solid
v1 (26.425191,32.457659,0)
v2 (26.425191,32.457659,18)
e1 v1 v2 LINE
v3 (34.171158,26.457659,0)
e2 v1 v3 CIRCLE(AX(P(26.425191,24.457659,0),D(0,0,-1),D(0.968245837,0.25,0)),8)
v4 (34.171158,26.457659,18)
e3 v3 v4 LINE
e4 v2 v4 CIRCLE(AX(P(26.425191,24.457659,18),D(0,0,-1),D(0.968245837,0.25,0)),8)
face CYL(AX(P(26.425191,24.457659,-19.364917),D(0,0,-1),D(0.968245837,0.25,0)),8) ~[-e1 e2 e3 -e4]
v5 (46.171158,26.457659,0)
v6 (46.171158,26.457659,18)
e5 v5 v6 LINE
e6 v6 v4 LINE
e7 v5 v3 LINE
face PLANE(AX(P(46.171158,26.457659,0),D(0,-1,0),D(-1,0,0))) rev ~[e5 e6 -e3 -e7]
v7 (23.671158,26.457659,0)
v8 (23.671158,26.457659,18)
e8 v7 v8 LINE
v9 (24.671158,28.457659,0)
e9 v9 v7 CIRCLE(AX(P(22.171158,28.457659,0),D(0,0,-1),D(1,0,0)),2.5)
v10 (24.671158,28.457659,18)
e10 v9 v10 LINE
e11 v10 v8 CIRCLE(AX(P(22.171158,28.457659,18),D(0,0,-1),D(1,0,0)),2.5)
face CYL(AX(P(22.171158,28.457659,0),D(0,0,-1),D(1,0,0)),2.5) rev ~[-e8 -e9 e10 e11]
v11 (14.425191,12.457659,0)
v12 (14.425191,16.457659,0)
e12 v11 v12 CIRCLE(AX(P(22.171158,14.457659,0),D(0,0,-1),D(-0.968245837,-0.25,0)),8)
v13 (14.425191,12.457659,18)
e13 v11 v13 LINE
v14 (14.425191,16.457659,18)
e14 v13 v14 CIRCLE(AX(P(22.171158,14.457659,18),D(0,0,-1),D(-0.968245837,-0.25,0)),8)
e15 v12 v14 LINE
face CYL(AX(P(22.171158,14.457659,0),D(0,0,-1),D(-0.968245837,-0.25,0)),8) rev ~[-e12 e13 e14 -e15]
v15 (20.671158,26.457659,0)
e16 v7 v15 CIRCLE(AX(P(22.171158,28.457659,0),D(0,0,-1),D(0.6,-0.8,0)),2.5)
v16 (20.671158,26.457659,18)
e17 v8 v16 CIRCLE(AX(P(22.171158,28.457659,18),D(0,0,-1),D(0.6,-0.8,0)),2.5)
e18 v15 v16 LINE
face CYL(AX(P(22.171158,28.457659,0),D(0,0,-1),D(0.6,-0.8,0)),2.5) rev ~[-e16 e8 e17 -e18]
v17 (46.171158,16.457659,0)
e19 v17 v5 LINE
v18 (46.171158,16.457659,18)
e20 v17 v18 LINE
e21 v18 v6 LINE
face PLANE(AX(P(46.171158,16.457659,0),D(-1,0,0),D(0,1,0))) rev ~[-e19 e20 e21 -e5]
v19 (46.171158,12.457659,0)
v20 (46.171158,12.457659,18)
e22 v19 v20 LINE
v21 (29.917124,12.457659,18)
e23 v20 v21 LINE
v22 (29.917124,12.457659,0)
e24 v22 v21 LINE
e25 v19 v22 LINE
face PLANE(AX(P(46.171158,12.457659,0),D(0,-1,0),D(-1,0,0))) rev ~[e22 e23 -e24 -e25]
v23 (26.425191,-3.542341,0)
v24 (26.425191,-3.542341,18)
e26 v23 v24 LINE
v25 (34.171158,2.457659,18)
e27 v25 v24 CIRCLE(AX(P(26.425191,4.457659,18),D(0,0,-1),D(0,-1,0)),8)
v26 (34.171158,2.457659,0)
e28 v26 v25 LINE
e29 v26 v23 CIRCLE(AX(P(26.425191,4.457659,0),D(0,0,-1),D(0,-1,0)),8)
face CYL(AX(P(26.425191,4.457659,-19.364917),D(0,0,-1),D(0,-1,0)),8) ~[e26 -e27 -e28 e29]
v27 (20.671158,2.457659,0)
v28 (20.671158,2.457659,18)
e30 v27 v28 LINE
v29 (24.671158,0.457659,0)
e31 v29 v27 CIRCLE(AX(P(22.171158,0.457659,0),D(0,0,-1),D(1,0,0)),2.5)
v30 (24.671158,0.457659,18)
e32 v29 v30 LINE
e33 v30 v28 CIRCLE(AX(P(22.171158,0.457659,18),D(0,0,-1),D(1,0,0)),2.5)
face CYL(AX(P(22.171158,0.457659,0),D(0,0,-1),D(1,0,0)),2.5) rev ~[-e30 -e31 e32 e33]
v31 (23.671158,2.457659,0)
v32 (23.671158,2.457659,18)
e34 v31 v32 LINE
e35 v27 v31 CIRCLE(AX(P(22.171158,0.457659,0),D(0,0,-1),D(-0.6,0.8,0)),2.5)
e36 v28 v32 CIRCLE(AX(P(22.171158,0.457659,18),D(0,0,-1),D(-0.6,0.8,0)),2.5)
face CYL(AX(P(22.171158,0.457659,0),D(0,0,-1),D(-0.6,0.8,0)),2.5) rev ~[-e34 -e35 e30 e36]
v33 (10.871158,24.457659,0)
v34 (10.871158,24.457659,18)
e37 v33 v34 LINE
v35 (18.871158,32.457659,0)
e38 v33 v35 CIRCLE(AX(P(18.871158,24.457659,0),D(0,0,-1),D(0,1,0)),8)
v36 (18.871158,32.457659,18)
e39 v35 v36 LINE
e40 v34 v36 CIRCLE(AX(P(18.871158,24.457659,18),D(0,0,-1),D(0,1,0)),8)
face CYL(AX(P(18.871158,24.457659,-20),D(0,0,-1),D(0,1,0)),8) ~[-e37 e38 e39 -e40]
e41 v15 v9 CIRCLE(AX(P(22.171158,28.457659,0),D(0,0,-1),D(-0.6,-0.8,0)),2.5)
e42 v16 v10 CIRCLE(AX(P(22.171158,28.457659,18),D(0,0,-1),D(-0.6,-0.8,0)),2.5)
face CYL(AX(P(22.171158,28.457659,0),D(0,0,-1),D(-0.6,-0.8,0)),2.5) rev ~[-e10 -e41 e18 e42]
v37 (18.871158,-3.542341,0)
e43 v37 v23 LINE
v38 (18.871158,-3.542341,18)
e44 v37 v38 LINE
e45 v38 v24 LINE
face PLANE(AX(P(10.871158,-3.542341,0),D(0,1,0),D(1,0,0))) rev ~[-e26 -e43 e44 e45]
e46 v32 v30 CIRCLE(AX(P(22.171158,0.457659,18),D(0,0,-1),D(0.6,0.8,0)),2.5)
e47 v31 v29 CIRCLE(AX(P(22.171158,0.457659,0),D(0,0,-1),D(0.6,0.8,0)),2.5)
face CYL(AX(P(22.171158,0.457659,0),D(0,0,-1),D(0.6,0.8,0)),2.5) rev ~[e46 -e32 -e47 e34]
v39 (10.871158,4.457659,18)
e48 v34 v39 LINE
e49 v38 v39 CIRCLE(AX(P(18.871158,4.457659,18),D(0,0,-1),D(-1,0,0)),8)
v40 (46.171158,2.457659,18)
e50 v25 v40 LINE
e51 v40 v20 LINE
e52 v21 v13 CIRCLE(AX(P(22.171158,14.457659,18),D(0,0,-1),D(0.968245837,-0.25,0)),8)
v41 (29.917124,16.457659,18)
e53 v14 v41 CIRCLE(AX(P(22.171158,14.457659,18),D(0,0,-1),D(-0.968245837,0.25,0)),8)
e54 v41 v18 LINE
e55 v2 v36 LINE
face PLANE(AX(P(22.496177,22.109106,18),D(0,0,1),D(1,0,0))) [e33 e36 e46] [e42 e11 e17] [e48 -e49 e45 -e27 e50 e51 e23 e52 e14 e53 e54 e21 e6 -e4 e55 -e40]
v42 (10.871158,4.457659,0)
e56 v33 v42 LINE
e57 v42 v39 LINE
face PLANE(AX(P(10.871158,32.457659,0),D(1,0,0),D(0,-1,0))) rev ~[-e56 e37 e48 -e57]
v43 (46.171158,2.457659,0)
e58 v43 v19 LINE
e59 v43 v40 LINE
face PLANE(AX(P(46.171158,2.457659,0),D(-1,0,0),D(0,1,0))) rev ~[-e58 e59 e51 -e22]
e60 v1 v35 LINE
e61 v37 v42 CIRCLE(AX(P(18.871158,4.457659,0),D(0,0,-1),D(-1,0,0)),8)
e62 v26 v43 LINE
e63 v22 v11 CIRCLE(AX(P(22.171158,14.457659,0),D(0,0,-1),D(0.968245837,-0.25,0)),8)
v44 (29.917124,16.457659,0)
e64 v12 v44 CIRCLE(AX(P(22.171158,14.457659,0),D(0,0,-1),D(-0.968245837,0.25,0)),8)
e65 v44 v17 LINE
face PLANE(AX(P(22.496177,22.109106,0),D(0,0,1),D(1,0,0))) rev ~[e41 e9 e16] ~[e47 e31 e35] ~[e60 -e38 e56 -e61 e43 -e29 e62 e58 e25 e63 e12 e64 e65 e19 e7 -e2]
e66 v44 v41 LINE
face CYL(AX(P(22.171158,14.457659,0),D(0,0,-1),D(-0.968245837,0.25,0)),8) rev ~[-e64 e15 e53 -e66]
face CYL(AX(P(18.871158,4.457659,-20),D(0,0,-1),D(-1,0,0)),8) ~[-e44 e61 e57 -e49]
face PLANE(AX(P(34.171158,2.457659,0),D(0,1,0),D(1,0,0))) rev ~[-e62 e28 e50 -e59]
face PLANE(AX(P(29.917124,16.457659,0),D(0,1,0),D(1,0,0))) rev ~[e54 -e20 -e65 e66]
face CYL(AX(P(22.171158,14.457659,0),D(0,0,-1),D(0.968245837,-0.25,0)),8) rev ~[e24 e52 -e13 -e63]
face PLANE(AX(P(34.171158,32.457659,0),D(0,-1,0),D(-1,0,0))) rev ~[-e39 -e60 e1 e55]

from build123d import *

# Parameters (mm, degrees)
F0_W        = 12
F0_H        = 10
F1_DEPTH    = 18
F2_T1_DEPTH = 56.7298334621
F2_T3_DEPTH = 58


# Not quite as in the source:
# - a fillet or chamfer that OpenCascade refuses, or shapes differently, is made with other operations: its cross-section is extruded or revolved along the edge and cut away or added


with BuildPart() as f1:
    # F0 (on Top) → F1 (new body)
    with BuildSketch(Plane.XY):
        with BuildLine():
            ThreePointArc((14.4251908534, 16.4576590359), (22.1711575458, 22.4576590359), (29.9171242382, 16.4576590359))
            Line((29.9171242382, 16.4576590359), (34.1711575458, 16.4576590359))
            Line((34.1711575458, 16.4576590359), (34.1711575458, 26.4576590359))
            Line((34.1711575458, 26.4576590359), (23.6711575458, 26.4576590359))
            ThreePointArc((23.6711575458, 26.4576590359), (22.1711575458, 25.9576590359), (20.6711575458, 26.4576590359))
            Line((20.6711575458, 26.4576590359), (10.8711575458, 26.4576590359))
            Line((10.8711575458, 26.4576590359), (10.8711575458, 16.4576590359))
            Line((10.8711575458, 16.4576590359), (14.4251908534, 16.4576590359))
        make_face()
        with BuildLine():
            Line((34.1711575458, 12.4576590359), (29.9171242382, 12.4576590359))
            ThreePointArc((29.9171242382, 12.4576590359), (22.1711575458, 6.4576590359), (14.4251908534, 12.4576590359))
            Line((14.4251908534, 12.4576590359), (10.8711575458, 12.4576590359))
            Line((10.8711575458, 12.4576590359), (10.8711575458, 2.4576590359))
            Line((10.8711575458, 2.4576590359), (20.6711575458, 2.4576590359))
            ThreePointArc((20.6711575458, 2.4576590359), (22.1711575458, 2.9576590359), (23.6711575458, 2.4576590359))
            Line((23.6711575458, 2.4576590359), (34.1711575458, 2.4576590359))
            Line((34.1711575458, 2.4576590359), (34.1711575458, 12.4576590359))
        make_face()
        with BuildLine():
            ThreePointArc((14.4251908534, 12.4576590359), (14.1711575458, 14.4576590359), (14.4251908534, 16.4576590359))
            Line((14.4251908534, 16.4576590359), (10.8711575458, 16.4576590359))
            Line((10.8711575458, 16.4576590359), (10.8711575458, 12.4576590359))
            Line((10.8711575458, 12.4576590359), (14.4251908534, 12.4576590359))
        make_face()
        with Locations((40.1711575458, 21.4576590359)):
            Rectangle(F0_W, F0_H)
        with Locations((40.1711575458, 7.4576590359)):
            Rectangle(F0_W, F0_H)
        with BuildLine():
            Line((23.6711575458, 26.4576590359), (34.1711575458, 26.4576590359))
            Line((34.1711575458, 26.4576590359), (34.1711575458, 32.4576590359))
            Line((34.1711575458, 32.4576590359), (10.8711575458, 32.4576590359))
            Line((10.8711575458, 32.4576590359), (10.8711575458, 26.4576590359))
            Line((10.8711575458, 26.4576590359), (20.6711575458, 26.4576590359))
            ThreePointArc((20.6711575458, 26.4576590359), (21.0531235571, 30.6937270134), (24.6711575458, 28.4576590359))
            ThreePointArc((24.6711575458, 28.4576590359), (24.4072255233, 27.3396250472), (23.6711575458, 26.4576590359))
        make_face()
        with BuildLine():
            Line((34.1711575458, -3.5423409641), (34.1711575458, 2.4576590359))
            Line((34.1711575458, 2.4576590359), (23.6711575458, 2.4576590359))
            ThreePointArc((23.6711575458, 2.4576590359), (24.4072255233, 1.5756930247), (24.6711575458, 0.4576590359))
            ThreePointArc((24.6711575458, 0.4576590359), (21.0531235571, -1.7784089416), (20.6711575458, 2.4576590359))
            Line((20.6711575458, 2.4576590359), (10.8711575458, 2.4576590359))
            Line((10.8711575458, 2.4576590359), (10.8711575458, -3.5423409641))
            Line((10.8711575458, -3.5423409641), (34.1711575458, -3.5423409641))
        make_face()
    extrude(amount=F1_DEPTH)

    # F2: fillet of radius 8 on 4 edges, made by hand

    # F2_s2 → F2_t1 (cut)
    with BuildSketch(Plane.XY.offset(-19.364916731)):
        with BuildLine():
            ThreePointArc((34.1711575458, 26.4576590359), (31.324170339, 30.7822143563), (26.4251908534, 32.4576590359))
            Line((26.4251908534, 32.4576590359), (34.1711575458, 32.4576590359))
            Line((34.1711575458, 32.4576590359), (34.1711575458, 26.4576590359))
        make_face()
        with BuildLine():
            ThreePointArc((26.4251908534, -3.5423409641), (31.324170339, -1.8668962844), (34.1711575458, 2.4576590359))
            Line((34.1711575458, 2.4576590359), (34.1711575458, -3.5423409641))
            Line((34.1711575458, -3.5423409641), (26.4251908534, -3.5423409641))
        make_face()
    extrude(amount=F2_T1_DEPTH, mode=Mode.SUBTRACT)

    # F2_s4 → F2_t3 (cut)
    with BuildSketch(Plane.XY.offset(-20)):
        with BuildLine():
            ThreePointArc((10.8711575458, 4.4576590359), (13.2143032963, -1.1991952136), (18.8711575458, -3.5423409641))
            Line((18.8711575458, -3.5423409641), (10.8711575458, -3.5423409641))
            Line((10.8711575458, -3.5423409641), (10.8711575458, 4.4576590359))
        make_face()
        with BuildLine():
            ThreePointArc((18.8711575458, 32.4576590359), (13.2143032963, 30.1145132854), (10.8711575458, 24.4576590359))
            Line((10.8711575458, 24.4576590359), (10.8711575458, 32.4576590359))
            Line((10.8711575458, 32.4576590359), (18.8711575458, 32.4576590359))
        make_face()
    extrude(amount=F2_T3_DEPTH, mode=Mode.SUBTRACT)


solid = f1.part
